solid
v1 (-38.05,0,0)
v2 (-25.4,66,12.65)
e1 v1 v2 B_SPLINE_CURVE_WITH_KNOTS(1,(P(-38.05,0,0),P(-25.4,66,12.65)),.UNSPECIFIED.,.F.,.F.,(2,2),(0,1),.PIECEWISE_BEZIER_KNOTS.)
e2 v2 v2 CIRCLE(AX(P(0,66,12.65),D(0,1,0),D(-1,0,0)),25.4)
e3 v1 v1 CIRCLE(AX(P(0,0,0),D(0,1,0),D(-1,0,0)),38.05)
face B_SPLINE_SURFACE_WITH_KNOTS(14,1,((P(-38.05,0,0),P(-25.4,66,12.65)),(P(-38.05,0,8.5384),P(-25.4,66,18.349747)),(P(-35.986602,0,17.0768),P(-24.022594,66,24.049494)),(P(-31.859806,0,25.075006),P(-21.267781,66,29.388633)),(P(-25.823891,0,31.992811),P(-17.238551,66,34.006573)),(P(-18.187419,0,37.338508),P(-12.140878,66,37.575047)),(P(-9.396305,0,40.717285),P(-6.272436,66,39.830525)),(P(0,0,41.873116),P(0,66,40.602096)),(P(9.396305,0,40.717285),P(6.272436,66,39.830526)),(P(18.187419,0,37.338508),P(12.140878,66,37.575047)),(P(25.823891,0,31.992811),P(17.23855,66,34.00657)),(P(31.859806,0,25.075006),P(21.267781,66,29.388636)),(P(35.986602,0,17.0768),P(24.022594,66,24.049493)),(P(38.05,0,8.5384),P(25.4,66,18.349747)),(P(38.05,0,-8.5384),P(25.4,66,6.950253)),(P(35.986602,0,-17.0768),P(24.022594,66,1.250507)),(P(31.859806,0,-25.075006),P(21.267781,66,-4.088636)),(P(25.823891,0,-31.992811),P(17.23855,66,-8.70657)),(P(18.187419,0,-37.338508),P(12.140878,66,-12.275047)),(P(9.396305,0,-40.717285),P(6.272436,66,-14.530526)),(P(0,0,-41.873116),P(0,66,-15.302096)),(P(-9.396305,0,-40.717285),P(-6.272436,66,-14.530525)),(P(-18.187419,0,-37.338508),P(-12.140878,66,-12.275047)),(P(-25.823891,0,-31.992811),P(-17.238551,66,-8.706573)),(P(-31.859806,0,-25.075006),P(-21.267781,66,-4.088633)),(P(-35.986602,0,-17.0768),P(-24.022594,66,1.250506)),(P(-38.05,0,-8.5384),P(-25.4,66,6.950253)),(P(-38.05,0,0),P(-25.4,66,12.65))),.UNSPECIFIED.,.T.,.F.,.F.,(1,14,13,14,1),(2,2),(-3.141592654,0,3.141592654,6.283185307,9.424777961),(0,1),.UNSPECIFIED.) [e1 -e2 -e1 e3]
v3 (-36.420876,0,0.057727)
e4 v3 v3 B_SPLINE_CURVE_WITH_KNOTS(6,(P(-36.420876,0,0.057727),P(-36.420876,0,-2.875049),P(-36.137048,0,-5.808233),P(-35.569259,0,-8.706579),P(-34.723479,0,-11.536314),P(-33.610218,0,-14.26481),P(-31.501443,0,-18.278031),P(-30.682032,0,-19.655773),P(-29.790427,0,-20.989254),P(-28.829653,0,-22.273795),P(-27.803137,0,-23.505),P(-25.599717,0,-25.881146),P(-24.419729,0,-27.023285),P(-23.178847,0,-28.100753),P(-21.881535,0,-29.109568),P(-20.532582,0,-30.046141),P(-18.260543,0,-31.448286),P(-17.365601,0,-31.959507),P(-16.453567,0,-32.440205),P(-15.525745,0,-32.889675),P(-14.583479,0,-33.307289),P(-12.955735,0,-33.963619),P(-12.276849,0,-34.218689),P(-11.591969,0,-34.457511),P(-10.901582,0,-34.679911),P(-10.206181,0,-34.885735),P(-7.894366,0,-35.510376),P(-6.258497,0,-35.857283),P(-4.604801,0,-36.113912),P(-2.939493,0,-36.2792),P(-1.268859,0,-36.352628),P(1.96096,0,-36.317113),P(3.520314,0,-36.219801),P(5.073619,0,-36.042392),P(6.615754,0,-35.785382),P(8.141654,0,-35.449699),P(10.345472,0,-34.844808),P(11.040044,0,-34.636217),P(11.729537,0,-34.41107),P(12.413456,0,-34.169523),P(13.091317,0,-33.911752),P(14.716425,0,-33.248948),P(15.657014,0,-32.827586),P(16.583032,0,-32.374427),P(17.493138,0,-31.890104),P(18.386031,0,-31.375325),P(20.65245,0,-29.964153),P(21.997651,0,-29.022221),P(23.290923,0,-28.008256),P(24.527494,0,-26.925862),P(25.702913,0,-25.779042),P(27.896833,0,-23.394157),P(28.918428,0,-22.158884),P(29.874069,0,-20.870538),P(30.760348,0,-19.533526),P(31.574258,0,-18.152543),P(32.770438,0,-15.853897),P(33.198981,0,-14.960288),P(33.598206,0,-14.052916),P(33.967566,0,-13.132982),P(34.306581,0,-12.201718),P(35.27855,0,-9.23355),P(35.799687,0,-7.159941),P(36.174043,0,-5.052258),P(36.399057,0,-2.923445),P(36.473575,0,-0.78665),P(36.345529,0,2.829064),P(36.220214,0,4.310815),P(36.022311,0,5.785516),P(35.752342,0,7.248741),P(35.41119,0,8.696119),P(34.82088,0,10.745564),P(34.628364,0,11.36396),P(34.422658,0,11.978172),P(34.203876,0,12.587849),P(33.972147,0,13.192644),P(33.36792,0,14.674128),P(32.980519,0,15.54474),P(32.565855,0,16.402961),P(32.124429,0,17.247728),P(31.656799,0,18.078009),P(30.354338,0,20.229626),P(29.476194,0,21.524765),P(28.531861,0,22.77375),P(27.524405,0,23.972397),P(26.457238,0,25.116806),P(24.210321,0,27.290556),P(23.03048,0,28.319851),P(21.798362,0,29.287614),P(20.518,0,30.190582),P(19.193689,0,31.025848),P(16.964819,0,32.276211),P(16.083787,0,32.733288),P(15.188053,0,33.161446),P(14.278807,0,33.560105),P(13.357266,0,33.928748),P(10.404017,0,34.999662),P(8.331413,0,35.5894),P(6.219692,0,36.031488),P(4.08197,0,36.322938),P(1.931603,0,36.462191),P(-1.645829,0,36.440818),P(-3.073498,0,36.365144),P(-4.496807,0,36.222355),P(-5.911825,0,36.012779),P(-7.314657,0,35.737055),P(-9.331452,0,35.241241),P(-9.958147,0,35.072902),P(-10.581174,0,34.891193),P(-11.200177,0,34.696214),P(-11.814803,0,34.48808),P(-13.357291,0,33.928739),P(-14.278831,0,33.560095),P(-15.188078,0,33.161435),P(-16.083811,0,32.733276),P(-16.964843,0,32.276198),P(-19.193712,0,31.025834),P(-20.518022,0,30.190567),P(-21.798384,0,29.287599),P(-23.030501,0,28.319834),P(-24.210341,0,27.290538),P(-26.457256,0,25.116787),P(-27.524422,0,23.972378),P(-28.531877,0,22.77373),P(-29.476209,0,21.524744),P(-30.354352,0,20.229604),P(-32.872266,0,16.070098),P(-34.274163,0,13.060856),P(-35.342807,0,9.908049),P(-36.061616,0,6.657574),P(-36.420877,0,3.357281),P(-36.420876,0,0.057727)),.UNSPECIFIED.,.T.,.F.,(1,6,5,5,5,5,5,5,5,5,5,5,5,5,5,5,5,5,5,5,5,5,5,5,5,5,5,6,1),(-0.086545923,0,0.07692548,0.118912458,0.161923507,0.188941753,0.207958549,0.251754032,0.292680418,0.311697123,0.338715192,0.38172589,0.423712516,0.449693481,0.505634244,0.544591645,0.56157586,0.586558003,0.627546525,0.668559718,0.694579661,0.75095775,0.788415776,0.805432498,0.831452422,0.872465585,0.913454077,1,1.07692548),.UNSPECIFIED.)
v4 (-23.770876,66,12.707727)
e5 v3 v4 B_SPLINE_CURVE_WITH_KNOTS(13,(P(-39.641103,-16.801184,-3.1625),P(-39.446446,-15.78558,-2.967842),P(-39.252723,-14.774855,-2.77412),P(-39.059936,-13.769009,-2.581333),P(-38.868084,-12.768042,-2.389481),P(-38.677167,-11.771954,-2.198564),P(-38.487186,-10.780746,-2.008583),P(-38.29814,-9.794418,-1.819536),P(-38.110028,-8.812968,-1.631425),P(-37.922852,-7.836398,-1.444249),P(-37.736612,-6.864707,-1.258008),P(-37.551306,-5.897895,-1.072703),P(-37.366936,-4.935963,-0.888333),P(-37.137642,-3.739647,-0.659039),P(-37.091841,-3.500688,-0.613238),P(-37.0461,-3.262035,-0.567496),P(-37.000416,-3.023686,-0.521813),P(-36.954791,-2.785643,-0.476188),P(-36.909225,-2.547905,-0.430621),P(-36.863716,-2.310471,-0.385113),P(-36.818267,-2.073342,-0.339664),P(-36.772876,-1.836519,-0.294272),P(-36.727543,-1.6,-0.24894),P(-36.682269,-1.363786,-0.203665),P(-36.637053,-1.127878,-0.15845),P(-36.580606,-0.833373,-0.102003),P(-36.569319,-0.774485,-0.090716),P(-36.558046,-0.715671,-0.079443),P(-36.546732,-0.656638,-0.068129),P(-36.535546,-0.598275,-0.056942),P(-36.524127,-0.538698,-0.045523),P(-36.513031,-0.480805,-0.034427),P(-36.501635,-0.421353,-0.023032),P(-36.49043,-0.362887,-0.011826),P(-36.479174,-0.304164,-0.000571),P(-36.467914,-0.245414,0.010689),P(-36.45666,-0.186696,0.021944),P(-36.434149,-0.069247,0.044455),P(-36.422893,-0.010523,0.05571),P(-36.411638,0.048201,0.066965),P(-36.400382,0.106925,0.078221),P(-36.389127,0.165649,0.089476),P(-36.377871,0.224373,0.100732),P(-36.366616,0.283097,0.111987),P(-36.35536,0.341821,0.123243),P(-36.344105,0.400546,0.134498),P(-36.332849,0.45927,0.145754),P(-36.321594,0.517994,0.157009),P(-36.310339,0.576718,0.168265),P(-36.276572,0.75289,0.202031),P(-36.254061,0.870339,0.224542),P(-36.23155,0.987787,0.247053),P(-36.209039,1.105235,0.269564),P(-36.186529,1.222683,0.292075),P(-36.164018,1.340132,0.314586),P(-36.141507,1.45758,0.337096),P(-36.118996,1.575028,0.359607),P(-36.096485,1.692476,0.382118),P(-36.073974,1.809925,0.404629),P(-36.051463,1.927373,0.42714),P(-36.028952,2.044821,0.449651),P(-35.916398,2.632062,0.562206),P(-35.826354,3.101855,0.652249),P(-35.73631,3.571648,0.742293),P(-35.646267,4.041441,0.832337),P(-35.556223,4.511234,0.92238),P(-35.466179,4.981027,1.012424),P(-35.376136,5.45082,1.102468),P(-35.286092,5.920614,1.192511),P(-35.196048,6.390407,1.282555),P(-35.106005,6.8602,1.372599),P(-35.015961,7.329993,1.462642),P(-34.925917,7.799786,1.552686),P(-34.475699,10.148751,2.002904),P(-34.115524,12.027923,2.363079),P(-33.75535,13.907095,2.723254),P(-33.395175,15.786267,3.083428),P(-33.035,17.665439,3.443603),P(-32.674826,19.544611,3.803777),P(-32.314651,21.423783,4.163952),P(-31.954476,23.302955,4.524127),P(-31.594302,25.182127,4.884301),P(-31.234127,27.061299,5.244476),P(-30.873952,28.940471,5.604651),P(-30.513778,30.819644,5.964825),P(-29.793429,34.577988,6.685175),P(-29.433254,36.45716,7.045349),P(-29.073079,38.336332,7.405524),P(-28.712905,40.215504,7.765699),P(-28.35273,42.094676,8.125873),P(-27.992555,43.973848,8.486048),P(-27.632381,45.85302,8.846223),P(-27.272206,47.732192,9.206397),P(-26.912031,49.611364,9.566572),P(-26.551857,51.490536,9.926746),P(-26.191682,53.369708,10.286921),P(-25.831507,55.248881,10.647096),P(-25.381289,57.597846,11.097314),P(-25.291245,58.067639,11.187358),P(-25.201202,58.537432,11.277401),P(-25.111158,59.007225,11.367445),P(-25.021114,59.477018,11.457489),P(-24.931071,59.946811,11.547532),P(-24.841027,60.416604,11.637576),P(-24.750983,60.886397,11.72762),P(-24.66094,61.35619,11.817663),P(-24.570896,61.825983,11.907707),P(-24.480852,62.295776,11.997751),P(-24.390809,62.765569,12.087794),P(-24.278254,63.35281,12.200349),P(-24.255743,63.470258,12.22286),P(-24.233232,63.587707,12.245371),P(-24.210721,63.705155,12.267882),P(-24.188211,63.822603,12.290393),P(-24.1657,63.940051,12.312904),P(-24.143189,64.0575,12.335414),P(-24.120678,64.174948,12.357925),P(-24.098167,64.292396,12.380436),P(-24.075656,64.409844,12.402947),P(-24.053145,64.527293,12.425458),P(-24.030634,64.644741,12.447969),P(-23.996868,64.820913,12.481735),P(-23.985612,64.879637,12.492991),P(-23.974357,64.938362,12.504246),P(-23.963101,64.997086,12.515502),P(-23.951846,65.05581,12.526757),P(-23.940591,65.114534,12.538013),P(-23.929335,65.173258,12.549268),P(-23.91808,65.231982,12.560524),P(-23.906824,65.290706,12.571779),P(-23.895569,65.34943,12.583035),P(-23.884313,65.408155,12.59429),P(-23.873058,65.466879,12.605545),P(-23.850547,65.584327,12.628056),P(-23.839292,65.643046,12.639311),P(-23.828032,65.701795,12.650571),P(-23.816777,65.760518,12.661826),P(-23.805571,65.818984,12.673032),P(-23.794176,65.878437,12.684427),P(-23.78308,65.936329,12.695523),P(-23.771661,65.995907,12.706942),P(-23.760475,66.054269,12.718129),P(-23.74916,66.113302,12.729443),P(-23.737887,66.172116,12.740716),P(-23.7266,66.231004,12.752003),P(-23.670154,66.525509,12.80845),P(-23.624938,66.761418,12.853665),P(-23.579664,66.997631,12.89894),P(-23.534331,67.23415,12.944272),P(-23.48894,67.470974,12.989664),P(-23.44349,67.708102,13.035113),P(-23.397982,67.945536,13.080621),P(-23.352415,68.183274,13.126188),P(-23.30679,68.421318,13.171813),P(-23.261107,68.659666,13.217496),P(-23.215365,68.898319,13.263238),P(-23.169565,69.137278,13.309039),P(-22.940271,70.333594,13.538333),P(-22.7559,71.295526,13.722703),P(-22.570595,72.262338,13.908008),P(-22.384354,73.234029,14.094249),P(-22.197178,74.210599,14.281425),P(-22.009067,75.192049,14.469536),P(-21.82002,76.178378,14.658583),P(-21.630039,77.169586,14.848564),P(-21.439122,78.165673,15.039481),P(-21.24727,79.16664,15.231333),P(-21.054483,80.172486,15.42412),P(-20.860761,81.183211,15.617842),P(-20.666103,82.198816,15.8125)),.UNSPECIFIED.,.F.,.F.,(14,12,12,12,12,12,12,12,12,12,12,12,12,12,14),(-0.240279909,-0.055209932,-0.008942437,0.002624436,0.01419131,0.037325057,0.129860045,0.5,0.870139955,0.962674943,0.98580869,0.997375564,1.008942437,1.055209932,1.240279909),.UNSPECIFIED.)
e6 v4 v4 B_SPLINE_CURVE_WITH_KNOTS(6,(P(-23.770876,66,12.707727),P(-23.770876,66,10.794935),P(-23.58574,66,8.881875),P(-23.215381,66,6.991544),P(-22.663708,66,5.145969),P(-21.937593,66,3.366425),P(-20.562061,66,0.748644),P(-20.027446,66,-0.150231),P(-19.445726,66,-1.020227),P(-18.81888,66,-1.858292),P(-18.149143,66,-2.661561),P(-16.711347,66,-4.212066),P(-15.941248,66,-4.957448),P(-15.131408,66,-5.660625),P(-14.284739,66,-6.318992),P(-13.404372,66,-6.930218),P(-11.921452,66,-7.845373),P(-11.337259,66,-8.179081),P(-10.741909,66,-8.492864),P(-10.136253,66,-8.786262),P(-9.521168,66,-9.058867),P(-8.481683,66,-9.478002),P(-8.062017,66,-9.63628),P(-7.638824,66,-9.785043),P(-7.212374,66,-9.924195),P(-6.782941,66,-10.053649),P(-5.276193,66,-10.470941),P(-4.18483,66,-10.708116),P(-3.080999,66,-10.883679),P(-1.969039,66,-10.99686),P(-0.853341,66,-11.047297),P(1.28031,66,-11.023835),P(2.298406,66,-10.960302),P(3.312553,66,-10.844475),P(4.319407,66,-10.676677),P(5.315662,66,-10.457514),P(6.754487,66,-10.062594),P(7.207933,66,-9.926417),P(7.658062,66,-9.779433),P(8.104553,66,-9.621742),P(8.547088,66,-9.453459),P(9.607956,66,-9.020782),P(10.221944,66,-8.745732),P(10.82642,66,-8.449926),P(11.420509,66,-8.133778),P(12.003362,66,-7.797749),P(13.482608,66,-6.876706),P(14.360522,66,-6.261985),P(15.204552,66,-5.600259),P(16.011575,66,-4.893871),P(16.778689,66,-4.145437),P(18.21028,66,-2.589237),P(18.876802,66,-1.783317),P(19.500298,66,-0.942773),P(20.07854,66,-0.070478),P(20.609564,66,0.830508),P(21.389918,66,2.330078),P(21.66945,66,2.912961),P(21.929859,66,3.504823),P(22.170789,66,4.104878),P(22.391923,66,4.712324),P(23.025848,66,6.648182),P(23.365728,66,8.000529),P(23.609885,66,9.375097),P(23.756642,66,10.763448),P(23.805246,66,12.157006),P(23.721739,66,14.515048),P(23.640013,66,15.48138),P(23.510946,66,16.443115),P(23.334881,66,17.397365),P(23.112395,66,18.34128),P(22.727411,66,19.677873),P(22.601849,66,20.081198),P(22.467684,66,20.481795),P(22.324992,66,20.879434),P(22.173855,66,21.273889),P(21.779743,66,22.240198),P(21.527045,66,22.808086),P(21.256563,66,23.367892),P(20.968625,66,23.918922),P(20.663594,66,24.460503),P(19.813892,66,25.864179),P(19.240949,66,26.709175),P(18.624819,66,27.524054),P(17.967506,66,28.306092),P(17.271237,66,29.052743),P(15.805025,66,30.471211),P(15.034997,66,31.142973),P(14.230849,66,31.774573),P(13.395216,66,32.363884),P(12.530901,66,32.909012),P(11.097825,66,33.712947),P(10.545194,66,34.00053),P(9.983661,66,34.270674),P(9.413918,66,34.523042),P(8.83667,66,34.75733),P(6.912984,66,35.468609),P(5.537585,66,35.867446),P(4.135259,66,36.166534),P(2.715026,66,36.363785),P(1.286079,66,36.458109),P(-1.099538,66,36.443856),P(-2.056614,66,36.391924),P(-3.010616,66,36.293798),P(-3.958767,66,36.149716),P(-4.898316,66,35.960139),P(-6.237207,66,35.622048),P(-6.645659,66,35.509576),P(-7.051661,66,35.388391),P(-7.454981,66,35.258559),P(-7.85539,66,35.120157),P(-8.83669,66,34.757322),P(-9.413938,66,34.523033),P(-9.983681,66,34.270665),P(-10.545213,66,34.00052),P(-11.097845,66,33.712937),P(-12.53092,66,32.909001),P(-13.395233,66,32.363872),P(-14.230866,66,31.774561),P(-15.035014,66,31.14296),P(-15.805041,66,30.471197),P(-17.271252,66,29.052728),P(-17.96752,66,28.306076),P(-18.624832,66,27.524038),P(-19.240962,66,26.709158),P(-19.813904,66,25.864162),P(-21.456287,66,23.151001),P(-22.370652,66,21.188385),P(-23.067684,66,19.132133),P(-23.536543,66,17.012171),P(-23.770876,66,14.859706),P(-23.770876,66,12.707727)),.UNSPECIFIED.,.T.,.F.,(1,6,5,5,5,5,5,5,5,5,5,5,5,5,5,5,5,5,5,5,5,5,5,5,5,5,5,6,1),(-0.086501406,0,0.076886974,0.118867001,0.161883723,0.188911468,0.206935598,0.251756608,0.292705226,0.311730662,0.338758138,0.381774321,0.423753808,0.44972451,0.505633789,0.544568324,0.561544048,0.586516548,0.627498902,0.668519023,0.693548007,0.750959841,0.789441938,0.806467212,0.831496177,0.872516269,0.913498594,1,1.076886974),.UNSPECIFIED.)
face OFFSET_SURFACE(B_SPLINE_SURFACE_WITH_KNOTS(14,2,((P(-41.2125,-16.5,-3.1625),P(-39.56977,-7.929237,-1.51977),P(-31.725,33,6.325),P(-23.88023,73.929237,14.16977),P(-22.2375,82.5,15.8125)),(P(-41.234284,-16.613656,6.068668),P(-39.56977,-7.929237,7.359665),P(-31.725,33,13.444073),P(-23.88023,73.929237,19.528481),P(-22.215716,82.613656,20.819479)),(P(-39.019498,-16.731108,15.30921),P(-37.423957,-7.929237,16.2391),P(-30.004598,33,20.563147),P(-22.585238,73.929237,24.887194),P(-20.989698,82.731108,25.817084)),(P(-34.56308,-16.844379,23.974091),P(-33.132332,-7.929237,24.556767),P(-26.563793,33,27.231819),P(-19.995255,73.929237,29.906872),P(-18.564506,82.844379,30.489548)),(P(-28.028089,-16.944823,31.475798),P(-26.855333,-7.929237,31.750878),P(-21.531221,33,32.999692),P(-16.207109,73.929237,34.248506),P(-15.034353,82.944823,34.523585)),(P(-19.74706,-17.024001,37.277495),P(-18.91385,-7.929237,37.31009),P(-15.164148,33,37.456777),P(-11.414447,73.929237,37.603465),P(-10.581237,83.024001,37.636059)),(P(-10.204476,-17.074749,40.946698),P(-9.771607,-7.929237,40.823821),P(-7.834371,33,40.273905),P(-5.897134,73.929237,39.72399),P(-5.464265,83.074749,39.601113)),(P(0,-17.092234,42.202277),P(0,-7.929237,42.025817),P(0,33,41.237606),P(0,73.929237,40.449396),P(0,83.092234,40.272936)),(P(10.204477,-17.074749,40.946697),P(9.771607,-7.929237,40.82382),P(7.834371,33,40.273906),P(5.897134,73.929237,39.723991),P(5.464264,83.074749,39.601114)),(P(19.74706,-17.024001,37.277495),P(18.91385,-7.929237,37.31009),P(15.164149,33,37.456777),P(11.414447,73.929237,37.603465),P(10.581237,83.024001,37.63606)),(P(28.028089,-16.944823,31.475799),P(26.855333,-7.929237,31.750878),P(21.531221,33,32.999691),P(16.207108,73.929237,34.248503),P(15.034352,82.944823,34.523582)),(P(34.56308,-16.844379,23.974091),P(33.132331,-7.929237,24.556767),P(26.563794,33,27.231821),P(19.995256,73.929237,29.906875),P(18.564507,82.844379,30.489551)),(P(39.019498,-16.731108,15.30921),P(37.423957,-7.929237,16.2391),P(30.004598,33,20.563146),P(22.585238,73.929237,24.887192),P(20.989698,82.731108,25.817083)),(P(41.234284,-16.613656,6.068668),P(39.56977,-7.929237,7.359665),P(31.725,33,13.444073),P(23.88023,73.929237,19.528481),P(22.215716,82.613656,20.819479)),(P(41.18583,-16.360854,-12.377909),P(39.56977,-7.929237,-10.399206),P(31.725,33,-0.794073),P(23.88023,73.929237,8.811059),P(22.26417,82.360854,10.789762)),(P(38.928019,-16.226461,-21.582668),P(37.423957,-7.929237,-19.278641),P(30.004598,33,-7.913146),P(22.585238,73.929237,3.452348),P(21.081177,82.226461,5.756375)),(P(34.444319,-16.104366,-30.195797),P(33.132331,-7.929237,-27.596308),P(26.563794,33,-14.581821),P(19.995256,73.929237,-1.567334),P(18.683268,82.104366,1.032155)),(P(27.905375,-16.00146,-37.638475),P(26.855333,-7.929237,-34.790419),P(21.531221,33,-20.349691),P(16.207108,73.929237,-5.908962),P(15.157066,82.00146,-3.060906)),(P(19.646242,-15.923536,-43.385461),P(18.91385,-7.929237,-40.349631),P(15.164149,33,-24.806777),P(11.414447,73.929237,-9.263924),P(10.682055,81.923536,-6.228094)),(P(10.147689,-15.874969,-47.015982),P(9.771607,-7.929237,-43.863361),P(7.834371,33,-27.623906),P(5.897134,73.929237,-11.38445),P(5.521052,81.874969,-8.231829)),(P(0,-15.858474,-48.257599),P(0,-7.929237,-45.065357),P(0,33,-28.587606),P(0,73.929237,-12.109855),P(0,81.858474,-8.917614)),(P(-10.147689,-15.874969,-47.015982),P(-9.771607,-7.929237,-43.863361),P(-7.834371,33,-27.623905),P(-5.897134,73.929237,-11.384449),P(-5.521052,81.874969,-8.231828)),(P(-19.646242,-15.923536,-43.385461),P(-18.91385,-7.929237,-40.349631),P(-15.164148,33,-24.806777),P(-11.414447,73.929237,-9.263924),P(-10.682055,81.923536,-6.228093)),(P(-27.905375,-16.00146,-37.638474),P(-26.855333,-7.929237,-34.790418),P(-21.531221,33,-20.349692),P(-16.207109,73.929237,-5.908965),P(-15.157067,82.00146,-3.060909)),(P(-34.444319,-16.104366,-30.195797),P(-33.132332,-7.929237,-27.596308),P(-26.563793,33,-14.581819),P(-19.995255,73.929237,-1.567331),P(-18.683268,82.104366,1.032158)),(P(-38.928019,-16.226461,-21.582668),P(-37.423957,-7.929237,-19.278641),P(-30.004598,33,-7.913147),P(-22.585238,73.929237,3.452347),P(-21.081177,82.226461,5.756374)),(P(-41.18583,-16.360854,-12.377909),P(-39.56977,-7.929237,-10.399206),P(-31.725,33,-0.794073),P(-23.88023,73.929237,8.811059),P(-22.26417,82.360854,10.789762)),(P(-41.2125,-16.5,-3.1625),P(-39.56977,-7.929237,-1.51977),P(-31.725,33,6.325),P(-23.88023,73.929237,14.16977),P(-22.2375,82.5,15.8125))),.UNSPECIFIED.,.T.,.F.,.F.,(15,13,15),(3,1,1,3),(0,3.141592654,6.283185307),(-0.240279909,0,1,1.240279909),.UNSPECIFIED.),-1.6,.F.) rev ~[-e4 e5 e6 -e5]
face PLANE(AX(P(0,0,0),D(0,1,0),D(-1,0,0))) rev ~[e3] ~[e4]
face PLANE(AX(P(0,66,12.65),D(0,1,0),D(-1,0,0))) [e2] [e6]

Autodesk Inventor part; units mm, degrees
ref_plane "YZ Plane" through (0, 0, 0) normal (1, 0, 0) x (0, 1, 0)
ref_plane "XY Plane" through (0, 0, 0) normal (0, 0, 1) x (1, 0, 0)
sketch "Szkic6" plane through (0, 0, 0) normal (0, 1, 0) x (-1, 0, 0)
  circle A0 centre (0, 0) radius 38.05
  dimension "d33" = 76.1
ref_plane "Płaszczyzna konstrukcyjna1" through (0, 66, 0) normal (0, 1, 0) x (-1, 0, 0)
sketch "Szkic7" plane through (0, 66, 0) normal (0, 1, 0) x (-1, 0, 0)
  circle A0 centre (0, 12.65) radius 25.4
  line L0 (0, -20.3) -> (0, 20.3) construction
  circle A1 centre (0, 0) radius 38.05 construction
  dimension "d35" = 50.8
loft "Wyciągnięcie złożone1" add profiles "Szkic6", "Szkic7"
shell "Skorupa1" thickness 1.6 removed faces 2 at (-4.0858, 66, 11.6429) at (-5.8996, 0, 7.9079)
equation "\"d33\" = OD1"
equation "\"d35\" = OD2"
equation "\"d52\" = THK"
equation "\"SzerokośćGięciaPodcięcia\" = Grubość"
equation "\"RozmiarPodcięciaNarożnika\" = 4 * Grubość"
equation "\"PromieńPrzejścia\" = PromieńGięcia"
equation "\"Rozmiar_promienia_Jacobiego\" = PromieńGięcia"
equation "\"Wielk_odstępu\" = Grubość"
equation "\"d2\" = PromieńGięcia"
equation "\"d23\" = PromieńGięcia"
equation "\"OD1\" = 76.1"
equation "\"OD2\" = 50.8"
equation "\"L\" = 66"
equation "\"THK\" = 1.6"
equation "\"d34\" = L"
equation "\"Grubość\" = 1.5"
equation "\"PromieńGięcia\" = 3"
properties part number "Redukcja asymetryczna Ø76,1x50,8x1,6 L=66" material "304"
